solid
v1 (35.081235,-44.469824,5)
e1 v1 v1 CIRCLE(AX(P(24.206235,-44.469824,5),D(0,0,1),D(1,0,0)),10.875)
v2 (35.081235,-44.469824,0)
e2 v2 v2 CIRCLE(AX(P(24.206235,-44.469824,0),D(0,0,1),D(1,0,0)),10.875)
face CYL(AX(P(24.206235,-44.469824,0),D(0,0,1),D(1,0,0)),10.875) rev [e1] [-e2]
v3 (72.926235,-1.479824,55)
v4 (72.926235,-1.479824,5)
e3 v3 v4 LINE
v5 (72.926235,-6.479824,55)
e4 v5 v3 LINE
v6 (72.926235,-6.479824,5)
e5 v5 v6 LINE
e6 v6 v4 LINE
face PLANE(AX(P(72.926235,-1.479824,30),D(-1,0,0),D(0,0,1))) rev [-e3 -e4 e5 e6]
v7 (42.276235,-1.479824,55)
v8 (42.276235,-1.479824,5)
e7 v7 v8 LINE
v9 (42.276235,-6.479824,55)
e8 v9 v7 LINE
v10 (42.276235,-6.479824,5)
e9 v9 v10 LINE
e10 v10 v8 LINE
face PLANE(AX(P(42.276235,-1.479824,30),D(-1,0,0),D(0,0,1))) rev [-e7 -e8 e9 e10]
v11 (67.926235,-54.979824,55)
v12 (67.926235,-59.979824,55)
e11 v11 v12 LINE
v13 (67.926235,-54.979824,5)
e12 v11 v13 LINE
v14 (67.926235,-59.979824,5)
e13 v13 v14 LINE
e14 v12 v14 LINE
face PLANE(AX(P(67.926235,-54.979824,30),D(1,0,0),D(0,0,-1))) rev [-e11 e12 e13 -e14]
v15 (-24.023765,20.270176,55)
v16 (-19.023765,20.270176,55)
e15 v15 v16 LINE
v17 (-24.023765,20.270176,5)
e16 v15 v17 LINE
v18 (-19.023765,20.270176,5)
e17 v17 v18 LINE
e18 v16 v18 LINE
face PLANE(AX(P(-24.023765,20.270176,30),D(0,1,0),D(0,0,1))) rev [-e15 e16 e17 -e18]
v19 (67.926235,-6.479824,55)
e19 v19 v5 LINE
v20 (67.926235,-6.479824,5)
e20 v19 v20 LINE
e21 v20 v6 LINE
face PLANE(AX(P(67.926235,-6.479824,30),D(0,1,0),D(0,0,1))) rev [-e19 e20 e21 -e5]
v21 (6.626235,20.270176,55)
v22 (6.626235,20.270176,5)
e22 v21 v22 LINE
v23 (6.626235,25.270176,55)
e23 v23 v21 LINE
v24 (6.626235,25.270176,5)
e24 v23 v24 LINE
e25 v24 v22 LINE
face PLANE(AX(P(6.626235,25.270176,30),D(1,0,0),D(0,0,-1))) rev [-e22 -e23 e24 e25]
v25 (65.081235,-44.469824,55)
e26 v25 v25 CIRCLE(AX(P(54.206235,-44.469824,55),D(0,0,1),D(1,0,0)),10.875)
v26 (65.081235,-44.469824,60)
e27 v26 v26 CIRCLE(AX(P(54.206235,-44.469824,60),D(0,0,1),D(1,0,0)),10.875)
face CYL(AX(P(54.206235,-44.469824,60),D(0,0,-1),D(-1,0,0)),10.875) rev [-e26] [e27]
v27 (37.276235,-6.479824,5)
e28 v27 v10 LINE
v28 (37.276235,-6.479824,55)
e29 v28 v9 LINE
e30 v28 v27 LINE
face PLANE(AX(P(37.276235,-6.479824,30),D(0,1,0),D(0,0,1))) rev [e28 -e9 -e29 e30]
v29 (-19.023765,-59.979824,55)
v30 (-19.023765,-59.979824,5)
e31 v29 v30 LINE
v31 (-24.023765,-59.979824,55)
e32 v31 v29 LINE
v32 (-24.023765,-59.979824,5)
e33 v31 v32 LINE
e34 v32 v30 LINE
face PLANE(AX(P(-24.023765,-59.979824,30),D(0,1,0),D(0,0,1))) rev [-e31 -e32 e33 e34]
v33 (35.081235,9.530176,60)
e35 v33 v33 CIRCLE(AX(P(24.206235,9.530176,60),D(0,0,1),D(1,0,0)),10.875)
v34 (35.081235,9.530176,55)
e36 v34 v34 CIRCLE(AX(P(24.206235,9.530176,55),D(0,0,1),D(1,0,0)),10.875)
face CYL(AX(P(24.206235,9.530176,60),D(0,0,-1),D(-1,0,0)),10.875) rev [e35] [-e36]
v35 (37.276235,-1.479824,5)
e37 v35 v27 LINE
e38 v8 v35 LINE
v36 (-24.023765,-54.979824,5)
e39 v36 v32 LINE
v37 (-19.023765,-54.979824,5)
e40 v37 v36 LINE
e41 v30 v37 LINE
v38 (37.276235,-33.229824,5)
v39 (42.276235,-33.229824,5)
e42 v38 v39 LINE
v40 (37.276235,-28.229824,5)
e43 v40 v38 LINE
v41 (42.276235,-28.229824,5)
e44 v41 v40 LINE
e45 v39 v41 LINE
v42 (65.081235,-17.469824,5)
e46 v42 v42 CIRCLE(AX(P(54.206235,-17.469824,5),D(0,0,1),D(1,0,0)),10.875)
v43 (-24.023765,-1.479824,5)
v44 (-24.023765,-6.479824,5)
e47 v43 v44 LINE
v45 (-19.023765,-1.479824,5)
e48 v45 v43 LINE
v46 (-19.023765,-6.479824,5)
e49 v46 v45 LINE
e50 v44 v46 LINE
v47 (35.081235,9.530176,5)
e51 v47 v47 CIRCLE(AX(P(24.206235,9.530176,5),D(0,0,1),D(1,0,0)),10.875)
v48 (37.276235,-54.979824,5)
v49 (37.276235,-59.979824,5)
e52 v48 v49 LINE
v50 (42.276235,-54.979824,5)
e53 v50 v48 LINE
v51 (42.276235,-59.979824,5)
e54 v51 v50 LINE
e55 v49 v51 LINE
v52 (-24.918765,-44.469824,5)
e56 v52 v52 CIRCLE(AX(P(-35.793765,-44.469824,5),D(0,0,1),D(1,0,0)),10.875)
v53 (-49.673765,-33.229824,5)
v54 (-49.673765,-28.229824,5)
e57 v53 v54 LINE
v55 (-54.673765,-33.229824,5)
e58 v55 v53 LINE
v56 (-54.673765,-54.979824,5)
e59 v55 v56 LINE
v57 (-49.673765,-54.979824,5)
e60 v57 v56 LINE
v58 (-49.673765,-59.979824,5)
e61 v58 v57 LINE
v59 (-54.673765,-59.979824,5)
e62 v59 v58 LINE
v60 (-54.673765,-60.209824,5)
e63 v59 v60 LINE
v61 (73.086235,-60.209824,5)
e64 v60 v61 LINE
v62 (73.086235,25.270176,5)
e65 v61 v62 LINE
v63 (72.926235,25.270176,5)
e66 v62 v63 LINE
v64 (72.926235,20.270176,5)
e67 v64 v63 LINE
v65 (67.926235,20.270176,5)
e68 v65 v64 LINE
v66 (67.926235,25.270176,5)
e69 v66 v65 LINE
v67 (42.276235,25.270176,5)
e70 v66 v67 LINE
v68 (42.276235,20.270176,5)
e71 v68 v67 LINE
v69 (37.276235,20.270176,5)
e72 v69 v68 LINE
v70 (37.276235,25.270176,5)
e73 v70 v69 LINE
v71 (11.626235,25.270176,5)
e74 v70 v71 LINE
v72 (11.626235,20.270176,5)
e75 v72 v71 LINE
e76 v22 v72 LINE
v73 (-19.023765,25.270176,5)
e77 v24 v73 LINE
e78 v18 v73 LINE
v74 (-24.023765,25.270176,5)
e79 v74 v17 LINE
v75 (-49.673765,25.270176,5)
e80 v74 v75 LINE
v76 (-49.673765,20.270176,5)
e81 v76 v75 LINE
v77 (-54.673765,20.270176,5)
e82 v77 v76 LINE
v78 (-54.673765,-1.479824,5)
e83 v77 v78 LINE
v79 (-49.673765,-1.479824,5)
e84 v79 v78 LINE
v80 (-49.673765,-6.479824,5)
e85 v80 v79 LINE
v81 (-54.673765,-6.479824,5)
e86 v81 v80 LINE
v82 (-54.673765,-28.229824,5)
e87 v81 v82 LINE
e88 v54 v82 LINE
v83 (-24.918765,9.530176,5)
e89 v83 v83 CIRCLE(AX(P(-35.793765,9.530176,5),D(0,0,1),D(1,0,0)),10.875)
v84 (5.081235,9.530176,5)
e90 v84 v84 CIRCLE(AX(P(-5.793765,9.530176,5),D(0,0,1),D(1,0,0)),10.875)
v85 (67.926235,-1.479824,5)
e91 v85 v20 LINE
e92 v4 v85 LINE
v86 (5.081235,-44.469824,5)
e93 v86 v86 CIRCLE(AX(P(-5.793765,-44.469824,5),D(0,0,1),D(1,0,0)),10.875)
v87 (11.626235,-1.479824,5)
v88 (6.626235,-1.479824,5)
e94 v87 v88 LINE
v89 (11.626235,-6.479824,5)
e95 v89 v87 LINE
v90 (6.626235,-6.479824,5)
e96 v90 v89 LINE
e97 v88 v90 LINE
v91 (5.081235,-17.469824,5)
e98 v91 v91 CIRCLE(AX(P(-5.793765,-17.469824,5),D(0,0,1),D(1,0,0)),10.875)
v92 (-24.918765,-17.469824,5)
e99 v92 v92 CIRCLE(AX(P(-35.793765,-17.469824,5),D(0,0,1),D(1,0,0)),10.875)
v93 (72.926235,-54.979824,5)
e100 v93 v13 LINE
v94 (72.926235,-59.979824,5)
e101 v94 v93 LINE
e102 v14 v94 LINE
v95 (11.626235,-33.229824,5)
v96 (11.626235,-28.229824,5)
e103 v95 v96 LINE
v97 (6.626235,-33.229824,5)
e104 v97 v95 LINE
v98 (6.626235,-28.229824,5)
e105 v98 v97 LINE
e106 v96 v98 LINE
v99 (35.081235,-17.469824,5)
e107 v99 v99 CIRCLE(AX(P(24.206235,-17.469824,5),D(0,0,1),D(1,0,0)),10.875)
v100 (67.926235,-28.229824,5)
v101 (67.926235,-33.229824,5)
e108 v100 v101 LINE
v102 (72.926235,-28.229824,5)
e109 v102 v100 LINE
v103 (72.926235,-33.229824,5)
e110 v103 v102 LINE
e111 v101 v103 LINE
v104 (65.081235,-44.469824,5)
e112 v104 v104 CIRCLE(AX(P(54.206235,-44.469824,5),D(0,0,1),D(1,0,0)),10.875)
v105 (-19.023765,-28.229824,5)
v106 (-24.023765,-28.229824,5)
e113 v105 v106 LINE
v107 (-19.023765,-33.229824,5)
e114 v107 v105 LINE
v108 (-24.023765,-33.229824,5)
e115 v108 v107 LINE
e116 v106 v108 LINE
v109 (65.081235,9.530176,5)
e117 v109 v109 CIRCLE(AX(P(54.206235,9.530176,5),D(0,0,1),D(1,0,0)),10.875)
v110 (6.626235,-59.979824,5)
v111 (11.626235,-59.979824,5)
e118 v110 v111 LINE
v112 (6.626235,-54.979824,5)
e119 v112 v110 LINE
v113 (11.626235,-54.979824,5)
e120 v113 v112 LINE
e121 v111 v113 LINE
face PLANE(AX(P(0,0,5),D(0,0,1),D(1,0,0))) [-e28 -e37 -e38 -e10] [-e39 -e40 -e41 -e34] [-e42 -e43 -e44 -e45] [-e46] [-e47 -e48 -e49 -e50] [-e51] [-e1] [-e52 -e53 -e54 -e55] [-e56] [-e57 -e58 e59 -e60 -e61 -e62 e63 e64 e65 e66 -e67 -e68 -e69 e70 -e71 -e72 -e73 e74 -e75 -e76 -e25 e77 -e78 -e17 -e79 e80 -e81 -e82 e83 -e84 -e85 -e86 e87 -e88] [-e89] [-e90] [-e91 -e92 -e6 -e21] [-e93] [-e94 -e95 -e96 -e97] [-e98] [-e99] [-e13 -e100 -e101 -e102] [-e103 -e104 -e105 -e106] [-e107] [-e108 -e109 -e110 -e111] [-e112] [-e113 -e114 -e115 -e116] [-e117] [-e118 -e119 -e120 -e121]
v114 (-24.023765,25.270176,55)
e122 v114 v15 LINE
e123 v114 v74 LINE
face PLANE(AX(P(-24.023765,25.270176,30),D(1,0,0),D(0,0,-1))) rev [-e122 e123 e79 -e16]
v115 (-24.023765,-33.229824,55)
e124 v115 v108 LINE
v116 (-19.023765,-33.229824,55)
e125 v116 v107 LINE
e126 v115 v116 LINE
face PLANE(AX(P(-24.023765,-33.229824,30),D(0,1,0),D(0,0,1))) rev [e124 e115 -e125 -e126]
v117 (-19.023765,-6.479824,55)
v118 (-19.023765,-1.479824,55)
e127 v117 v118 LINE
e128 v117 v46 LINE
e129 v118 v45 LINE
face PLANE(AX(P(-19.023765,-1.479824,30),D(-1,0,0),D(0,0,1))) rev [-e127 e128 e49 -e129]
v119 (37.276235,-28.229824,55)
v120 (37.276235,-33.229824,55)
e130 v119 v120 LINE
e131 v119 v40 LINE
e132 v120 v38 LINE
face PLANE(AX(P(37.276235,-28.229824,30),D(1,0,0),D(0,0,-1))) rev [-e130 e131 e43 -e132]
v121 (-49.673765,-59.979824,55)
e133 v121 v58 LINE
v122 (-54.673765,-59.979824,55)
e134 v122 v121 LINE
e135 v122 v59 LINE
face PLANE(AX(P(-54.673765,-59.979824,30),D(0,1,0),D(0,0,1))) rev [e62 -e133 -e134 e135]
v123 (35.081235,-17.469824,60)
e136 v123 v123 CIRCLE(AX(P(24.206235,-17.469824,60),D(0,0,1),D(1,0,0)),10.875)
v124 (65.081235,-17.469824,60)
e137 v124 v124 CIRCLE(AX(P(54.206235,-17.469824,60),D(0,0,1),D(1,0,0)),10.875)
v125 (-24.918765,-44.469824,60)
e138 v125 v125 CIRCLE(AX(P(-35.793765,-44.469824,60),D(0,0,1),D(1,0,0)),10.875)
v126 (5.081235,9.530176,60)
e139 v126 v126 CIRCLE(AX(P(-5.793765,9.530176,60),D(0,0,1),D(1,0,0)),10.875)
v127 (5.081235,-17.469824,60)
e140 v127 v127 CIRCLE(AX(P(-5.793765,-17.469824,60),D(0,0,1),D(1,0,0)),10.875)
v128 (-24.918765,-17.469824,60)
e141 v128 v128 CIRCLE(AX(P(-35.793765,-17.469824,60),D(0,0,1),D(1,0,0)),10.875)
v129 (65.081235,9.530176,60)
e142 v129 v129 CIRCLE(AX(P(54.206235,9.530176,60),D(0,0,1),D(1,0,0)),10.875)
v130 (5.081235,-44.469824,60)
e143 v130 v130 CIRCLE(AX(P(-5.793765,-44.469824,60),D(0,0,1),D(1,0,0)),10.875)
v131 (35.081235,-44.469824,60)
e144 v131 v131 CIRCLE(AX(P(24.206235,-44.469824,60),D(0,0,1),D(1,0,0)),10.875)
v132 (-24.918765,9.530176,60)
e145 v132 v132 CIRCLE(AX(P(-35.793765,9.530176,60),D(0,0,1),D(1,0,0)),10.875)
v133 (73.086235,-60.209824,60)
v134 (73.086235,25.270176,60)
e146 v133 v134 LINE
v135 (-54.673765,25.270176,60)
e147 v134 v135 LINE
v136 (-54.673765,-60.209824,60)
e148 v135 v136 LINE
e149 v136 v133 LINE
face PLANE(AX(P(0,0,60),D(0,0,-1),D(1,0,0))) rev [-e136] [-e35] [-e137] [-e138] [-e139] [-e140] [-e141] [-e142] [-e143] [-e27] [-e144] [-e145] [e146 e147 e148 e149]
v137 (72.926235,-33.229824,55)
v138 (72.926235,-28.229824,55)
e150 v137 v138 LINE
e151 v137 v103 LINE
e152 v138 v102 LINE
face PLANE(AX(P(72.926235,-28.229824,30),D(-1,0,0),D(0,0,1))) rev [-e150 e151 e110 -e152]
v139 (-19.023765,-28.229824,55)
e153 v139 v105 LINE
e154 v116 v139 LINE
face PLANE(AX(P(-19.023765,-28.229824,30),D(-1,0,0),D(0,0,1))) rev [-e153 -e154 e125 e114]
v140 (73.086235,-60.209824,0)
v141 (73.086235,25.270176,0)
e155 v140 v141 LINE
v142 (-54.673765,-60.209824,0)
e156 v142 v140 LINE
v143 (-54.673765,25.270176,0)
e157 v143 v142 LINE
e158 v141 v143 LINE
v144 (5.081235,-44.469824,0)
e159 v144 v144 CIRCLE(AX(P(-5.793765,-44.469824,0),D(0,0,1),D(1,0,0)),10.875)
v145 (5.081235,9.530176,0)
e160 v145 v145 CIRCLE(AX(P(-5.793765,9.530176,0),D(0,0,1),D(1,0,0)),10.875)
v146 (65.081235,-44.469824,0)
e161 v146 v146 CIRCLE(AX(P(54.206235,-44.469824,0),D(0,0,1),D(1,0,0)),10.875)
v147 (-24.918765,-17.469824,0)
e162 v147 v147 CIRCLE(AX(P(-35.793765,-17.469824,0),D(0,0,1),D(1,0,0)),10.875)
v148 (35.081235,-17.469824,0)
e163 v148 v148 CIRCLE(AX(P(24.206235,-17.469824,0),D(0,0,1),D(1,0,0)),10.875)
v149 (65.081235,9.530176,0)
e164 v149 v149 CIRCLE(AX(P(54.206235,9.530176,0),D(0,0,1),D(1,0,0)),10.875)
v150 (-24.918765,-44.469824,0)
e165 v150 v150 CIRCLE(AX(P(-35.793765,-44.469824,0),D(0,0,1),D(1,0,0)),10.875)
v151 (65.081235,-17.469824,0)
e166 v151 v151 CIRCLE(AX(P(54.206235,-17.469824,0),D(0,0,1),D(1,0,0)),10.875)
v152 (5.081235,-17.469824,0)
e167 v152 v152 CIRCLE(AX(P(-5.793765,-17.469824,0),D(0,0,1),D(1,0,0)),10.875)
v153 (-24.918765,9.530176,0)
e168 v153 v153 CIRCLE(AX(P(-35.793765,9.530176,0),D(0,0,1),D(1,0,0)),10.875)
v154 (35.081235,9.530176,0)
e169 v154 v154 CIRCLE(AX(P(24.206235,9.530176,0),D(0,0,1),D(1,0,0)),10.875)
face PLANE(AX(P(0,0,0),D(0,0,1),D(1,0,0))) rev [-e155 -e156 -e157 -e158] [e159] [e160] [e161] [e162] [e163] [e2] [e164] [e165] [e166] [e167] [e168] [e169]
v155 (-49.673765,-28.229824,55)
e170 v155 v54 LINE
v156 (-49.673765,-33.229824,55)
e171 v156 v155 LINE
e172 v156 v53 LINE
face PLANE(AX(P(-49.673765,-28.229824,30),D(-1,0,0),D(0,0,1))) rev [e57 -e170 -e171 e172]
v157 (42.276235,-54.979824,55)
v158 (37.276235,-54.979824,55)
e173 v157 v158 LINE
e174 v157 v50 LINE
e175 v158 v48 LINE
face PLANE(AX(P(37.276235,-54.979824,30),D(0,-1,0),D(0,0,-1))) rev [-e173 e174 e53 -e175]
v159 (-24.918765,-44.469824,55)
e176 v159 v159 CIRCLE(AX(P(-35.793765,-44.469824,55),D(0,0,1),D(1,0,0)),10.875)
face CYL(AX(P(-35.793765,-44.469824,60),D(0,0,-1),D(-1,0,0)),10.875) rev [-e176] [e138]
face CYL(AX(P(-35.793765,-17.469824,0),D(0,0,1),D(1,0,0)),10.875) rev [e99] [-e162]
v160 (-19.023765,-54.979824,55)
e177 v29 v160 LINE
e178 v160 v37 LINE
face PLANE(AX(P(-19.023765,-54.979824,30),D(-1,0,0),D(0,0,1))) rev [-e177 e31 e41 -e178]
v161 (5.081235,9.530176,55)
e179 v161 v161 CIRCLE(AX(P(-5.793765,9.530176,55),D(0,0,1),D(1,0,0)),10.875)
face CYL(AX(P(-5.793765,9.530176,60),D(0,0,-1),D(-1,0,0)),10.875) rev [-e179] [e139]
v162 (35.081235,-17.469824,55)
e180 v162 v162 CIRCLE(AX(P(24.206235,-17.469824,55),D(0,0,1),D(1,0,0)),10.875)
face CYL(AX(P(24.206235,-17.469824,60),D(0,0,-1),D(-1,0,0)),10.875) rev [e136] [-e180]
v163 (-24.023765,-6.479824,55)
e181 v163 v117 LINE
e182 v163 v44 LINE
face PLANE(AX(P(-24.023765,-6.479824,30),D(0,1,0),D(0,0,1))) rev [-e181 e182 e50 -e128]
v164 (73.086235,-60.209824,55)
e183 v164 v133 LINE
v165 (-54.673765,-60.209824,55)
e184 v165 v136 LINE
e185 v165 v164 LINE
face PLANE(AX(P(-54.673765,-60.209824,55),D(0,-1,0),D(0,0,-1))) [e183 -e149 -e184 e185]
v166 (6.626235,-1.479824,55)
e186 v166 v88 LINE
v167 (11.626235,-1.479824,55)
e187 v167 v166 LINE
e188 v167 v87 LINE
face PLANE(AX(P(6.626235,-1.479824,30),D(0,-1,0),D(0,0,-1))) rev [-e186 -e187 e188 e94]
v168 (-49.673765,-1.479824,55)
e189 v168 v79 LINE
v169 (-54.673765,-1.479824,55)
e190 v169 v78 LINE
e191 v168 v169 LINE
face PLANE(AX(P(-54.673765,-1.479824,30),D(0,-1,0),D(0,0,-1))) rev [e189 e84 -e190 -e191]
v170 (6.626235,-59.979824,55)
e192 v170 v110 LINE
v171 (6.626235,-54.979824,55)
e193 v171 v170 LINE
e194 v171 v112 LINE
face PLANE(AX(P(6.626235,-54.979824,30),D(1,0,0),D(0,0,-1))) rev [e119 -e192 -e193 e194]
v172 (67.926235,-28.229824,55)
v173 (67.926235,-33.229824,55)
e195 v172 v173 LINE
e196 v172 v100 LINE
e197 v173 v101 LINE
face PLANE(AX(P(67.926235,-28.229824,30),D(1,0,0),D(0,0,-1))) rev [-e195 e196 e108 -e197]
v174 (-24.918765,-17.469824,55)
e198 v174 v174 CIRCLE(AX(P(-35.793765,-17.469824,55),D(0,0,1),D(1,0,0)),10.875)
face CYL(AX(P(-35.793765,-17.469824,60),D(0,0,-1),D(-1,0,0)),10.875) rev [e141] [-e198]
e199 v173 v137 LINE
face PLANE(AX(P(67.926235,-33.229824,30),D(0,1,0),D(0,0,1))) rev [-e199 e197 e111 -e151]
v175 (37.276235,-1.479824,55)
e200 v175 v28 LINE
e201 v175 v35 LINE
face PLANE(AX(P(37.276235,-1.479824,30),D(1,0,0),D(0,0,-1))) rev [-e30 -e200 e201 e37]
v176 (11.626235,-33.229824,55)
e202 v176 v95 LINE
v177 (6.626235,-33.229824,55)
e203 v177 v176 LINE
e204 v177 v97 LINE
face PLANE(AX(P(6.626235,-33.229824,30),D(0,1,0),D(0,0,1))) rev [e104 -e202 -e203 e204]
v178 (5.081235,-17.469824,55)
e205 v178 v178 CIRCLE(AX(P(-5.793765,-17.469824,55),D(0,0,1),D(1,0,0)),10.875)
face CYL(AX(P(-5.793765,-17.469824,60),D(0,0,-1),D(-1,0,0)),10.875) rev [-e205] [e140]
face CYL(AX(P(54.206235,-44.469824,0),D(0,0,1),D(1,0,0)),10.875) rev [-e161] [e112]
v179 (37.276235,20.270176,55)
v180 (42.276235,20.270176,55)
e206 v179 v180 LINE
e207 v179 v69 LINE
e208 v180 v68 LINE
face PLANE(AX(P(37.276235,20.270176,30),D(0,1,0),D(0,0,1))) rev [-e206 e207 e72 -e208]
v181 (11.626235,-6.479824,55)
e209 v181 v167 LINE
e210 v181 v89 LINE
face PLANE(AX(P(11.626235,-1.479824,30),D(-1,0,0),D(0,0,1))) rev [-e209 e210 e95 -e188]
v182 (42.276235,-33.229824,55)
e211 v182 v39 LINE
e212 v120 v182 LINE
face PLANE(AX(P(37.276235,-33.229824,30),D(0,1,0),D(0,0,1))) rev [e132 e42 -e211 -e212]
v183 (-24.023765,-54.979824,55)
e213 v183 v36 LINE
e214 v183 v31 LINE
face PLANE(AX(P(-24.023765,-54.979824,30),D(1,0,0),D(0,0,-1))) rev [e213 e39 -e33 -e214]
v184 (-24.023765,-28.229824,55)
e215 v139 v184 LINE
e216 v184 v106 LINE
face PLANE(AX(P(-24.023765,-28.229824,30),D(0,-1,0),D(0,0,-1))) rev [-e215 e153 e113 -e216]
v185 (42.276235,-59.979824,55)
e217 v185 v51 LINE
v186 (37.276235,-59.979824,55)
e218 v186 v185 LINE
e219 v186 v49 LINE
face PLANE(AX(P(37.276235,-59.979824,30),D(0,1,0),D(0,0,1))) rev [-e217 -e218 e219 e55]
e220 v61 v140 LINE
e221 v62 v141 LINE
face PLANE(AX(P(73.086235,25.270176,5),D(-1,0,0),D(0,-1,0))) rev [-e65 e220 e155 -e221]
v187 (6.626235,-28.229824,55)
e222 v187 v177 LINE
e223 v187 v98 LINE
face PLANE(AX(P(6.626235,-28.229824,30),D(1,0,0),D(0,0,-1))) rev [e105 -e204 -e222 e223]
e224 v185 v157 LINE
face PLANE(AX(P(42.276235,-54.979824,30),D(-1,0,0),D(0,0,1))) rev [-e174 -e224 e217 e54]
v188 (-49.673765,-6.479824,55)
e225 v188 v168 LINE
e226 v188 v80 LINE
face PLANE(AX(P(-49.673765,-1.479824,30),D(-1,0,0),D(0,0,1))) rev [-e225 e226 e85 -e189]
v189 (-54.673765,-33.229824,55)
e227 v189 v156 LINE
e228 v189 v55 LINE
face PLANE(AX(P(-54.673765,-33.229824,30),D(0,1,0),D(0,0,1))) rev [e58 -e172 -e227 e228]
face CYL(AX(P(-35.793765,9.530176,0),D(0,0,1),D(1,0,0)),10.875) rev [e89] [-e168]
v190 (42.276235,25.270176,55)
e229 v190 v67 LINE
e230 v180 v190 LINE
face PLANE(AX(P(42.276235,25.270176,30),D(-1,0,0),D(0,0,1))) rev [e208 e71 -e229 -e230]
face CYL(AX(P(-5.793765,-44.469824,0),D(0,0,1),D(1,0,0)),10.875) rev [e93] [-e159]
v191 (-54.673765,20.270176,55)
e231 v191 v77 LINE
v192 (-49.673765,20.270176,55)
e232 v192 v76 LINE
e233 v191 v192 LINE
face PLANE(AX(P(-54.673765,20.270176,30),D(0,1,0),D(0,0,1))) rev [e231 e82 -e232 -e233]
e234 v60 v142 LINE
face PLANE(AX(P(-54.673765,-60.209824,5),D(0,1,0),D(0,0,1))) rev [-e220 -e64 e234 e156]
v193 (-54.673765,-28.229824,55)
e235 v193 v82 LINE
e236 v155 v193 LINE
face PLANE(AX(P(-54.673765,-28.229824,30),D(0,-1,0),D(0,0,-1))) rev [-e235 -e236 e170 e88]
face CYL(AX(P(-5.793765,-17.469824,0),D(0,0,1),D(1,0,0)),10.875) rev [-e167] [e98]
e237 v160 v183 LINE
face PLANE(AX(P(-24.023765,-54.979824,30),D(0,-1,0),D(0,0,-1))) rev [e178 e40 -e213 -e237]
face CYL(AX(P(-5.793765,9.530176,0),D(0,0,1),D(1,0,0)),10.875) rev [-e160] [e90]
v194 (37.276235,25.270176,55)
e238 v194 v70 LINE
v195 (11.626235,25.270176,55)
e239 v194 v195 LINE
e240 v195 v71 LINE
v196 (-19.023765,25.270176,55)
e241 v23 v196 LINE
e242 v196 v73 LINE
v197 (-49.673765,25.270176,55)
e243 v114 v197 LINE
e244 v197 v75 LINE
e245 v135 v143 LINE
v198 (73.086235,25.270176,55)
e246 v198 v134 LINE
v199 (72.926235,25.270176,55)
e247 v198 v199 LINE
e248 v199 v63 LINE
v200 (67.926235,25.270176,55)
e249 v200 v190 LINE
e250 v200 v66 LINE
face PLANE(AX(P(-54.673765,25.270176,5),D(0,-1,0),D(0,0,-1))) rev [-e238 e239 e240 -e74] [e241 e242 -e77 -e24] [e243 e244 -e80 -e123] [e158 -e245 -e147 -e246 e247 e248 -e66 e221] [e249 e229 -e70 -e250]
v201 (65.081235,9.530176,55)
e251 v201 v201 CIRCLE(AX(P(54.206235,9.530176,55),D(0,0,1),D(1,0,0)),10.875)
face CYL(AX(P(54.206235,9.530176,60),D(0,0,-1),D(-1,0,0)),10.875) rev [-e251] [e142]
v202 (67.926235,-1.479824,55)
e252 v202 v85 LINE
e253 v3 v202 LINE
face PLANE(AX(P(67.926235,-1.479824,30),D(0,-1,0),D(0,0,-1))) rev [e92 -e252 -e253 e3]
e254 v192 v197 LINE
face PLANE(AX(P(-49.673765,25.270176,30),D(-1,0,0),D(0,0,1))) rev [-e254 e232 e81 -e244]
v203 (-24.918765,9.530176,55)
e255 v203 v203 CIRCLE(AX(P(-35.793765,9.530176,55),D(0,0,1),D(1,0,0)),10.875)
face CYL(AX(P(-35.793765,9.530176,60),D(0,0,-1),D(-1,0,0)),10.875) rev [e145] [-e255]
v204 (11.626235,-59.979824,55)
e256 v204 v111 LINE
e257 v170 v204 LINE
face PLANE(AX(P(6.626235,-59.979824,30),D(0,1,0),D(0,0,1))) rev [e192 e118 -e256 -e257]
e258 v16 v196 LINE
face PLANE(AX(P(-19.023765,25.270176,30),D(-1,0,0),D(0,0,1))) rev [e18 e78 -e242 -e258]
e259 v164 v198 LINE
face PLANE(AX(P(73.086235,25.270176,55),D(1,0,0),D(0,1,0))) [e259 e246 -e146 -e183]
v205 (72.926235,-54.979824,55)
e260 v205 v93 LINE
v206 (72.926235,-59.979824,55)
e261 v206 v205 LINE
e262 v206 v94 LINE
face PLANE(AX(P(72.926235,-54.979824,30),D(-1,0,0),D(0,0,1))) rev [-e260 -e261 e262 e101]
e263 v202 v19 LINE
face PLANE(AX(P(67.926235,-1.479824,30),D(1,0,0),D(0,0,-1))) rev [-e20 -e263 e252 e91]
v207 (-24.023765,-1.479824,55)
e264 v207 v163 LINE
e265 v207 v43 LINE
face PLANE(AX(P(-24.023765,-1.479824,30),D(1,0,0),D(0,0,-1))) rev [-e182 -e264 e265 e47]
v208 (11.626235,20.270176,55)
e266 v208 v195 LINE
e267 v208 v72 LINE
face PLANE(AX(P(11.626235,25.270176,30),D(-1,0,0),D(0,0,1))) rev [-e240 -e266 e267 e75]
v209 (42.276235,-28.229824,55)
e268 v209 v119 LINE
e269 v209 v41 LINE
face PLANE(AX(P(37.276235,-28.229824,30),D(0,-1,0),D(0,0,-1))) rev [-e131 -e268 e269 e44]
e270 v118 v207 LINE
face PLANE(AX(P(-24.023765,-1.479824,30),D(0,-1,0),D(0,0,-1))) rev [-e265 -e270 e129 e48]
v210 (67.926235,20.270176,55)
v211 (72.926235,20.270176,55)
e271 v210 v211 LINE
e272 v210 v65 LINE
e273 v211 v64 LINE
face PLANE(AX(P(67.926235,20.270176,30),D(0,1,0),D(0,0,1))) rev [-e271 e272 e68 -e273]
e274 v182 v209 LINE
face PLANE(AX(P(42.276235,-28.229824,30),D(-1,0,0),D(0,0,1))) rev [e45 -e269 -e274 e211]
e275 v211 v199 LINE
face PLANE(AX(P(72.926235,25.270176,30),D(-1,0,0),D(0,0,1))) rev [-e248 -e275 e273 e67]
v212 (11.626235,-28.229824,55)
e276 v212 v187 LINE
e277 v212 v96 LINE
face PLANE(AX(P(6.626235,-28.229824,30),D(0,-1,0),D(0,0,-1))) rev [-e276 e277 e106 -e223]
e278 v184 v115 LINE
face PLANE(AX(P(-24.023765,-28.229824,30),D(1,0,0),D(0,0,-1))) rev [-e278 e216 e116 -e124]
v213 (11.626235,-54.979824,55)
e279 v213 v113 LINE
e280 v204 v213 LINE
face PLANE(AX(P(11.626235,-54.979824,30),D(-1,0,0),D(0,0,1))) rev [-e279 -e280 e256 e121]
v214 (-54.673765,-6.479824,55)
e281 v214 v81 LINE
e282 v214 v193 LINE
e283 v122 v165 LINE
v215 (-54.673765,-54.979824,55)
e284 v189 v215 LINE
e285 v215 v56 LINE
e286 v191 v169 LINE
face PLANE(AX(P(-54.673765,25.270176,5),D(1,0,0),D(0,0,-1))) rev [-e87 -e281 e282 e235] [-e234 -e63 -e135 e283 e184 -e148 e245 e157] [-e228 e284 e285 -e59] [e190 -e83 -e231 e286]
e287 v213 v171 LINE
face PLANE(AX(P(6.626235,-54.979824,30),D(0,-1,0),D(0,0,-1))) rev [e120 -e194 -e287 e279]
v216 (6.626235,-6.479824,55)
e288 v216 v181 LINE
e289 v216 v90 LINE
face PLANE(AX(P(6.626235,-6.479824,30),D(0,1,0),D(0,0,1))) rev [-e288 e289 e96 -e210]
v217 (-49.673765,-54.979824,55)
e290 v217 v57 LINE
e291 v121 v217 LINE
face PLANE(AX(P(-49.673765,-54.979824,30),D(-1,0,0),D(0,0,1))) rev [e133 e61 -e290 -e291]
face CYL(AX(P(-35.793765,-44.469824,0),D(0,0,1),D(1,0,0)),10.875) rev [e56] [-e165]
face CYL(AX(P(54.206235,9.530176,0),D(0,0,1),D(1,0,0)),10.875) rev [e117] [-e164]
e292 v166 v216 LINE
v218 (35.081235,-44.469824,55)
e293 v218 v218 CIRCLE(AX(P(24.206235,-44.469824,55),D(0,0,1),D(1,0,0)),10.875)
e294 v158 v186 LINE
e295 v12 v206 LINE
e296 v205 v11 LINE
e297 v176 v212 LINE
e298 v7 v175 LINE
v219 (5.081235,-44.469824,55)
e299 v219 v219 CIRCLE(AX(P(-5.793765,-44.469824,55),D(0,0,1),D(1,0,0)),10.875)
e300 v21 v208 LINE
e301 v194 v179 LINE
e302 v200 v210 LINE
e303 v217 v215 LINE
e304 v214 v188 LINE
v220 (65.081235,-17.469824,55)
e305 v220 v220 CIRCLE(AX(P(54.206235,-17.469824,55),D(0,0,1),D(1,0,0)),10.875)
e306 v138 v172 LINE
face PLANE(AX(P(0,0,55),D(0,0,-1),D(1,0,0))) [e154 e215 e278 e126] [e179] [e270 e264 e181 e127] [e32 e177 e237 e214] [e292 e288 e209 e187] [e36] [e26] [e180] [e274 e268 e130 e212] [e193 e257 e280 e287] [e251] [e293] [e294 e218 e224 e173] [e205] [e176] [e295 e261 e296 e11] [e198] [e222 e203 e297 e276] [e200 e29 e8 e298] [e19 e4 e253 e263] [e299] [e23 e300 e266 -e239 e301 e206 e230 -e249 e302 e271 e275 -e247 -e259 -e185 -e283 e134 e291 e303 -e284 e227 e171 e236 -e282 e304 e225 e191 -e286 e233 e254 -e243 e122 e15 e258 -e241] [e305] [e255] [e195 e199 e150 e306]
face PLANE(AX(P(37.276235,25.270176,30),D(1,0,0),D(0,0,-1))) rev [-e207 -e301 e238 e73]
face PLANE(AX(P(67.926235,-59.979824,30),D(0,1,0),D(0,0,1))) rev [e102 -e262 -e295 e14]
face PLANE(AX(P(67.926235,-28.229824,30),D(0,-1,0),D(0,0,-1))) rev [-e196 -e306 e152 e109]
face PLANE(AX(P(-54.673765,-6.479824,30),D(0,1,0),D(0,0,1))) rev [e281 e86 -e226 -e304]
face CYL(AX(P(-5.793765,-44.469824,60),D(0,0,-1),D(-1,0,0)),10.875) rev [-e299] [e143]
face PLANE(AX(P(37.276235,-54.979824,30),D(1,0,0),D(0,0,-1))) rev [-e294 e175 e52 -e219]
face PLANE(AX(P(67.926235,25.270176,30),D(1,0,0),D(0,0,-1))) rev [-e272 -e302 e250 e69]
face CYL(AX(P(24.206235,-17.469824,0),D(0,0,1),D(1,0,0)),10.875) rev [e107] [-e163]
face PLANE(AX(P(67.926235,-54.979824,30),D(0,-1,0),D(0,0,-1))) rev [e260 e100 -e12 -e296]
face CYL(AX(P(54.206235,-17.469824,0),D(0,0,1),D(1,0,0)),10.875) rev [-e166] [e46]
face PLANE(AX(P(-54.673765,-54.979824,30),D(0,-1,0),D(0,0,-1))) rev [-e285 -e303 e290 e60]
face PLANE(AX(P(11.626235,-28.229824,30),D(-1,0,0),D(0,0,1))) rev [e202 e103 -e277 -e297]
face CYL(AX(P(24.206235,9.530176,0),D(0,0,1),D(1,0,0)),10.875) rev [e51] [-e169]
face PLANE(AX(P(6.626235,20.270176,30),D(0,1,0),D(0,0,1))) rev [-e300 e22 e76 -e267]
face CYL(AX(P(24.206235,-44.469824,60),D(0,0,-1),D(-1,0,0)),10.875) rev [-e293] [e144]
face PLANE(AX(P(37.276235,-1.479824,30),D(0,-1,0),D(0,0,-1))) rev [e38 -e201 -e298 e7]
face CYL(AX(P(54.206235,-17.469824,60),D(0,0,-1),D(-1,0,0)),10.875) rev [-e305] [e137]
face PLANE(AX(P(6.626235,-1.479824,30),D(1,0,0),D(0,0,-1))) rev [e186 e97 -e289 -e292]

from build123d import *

# Parameters (mm, degrees)
SKETCH1_W                = 127.76
SKETCH1_H                = 85.48
BOSS_EXTRUDE1_DEPTH      = 5
SKETCH2_R                = 10.875
CUT_EXTRUDE1_DEPTH       = 95.825210988
SKETCH3_W                = 5
SKETCH3_H                = 5
BOSS_EXTRUDE2_DEPTH      = 25
LPATTERN2_COUNT          = 4
LPATTERN2_PITCH          = 30
LPATTERN2_COUNT_DIR2     = 3
LPATTERN2_PITCH_DIR2     = 27
LPATTERN3_COUNT          = 5
LPATTERN3_PITCH          = 30.65
LPATTERN3_COUNT_DIR2     = 4
LPATTERN3_PITCH_DIR2     = 26.75
MIRROR5_START            = -54.673764706
MIRROR5_OUTLINE_W        = 5
MIRROR5_OUTLINE_H        = 25
MIRROR5_DEPTH            = 5
MIRROR5_START_2          = -24.023764706
MIRROR5_2_OUTLINE_W      = 5
MIRROR5_2_OUTLINE_H      = 25
MIRROR5_2_DEPTH          = 5
MIRROR5_START_3          = 6.626235294
MIRROR5_3_OUTLINE_W      = 5
MIRROR5_3_OUTLINE_H      = 25
MIRROR5_3_DEPTH          = 5
MIRROR5_START_4          = 37.276235294
MIRROR5_4_OUTLINE_W      = 5
MIRROR5_4_OUTLINE_H      = 25
MIRROR5_4_DEPTH          = 5
MIRROR5_START_5          = 67.926235294
MIRROR5_5_OUTLINE_W      = 5
MIRROR5_5_OUTLINE_H      = 25
MIRROR5_5_DEPTH          = 5
MIRROR6_COPY_1_SKETCH_R  = 10.875
MIRROR6_COPY_1_DEPTH     = 95.825210988
MIRROR6_COPY_2_SKETCH_R  = 10.875
MIRROR6_COPY_2_DEPTH     = 95.825210988
MIRROR6_COPY_3_SKETCH_R  = 10.875
MIRROR6_COPY_3_DEPTH     = 95.825210988
MIRROR6_COPY_4_SKETCH_R  = 10.875
MIRROR6_COPY_4_DEPTH     = 95.825210988
MIRROR6_COPY_5_SKETCH_R  = 10.875
MIRROR6_COPY_5_DEPTH     = 95.825210988
MIRROR6_COPY_6_SKETCH_R  = 10.875
MIRROR6_COPY_6_DEPTH     = 95.825210988
MIRROR6_COPY_7_SKETCH_R  = 10.875
MIRROR6_COPY_7_DEPTH     = 95.825210988
MIRROR6_COPY_8_SKETCH_R  = 10.875
MIRROR6_COPY_8_DEPTH     = 95.825210988
MIRROR6_COPY_9_SKETCH_R  = 10.875
MIRROR6_COPY_9_DEPTH     = 95.825210988
MIRROR6_COPY_10_SKETCH_R = 10.875
MIRROR6_COPY_10_DEPTH    = 95.825210988
MIRROR6_COPY_11_SKETCH_R = 10.875
MIRROR6_COPY_11_DEPTH    = 95.825210988


# Read off the part's stored shape, not the designer's step: Mirror5
with BuildPart() as part:
    # Sketch1 → Boss-Extrude1 (new body)
    with BuildSketch(Plane.XY):
        with Locations((9.206235294, -17.469823529)):
            Rectangle(SKETCH1_W, SKETCH1_H)
    boss_extrude1 = extrude(amount=BOSS_EXTRUDE1_DEPTH)

    # Sketch2 → Cut-Extrude1 (cut, through all)
    with BuildSketch(Plane.XY.offset(5)):
        with Locations((-35.793764706, 9.530176471)):
            Circle(SKETCH2_R)
    cut_extrude1 = extrude(amount=-CUT_EXTRUDE1_DEPTH, mode=Mode.SUBTRACT)

    # Sketch3 → Boss-Extrude2 (add)
    with BuildSketch(Plane.XY.offset(5)):
        with Locations((-52.173764706, 22.770176471)):
            Rectangle(SKETCH3_W, SKETCH3_H)
    boss_extrude2 = extrude(amount=BOSS_EXTRUDE2_DEPTH)

    # LPattern2: Cut-Extrude1 4 × 3
    with Locations(*[(i * LPATTERN2_PITCH, -j * LPATTERN2_PITCH_DIR2, 0) for i in range(LPATTERN2_COUNT) for j in range(LPATTERN2_COUNT_DIR2) if (i, j) != (0, 0)]):
        add(cut_extrude1, mode=Mode.SUBTRACT)

    # LPattern3: Boss-Extrude2 5 × 4
    with Locations(*[(i * LPATTERN3_PITCH, -j * LPATTERN3_PITCH_DIR2, 0) for i in range(LPATTERN3_COUNT) for j in range(LPATTERN3_COUNT_DIR2) if (i, j) != (0, 0)]):
        add(boss_extrude2)

    # Mirror5 outline → Mirror5 (add)
    with BuildSketch(Plane.YZ.offset(MIRROR5_START)):
        with Locations((22.770176471, 42.5)):
            Rectangle(MIRROR5_OUTLINE_W, MIRROR5_OUTLINE_H)
        with Locations((-3.979823529, 42.5)):
            Rectangle(MIRROR5_OUTLINE_W, MIRROR5_OUTLINE_H)
        with Locations((-30.729823529, 42.5)):
            Rectangle(MIRROR5_OUTLINE_W, MIRROR5_OUTLINE_H)
        with Locations((-57.479823529, 42.5)):
            Rectangle(MIRROR5_OUTLINE_W, MIRROR5_OUTLINE_H)
    extrude(amount=MIRROR5_DEPTH)

    # Mirror5 2 outline → Mirror5 2 (add)
    with BuildSketch(Plane.YZ.offset(MIRROR5_START_2)):
        with Locations((22.770176471, 42.5)):
            Rectangle(MIRROR5_2_OUTLINE_W, MIRROR5_2_OUTLINE_H)
        with Locations((-3.979823529, 42.5)):
            Rectangle(MIRROR5_2_OUTLINE_W, MIRROR5_2_OUTLINE_H)
        with Locations((-30.729823529, 42.5)):
            Rectangle(MIRROR5_2_OUTLINE_W, MIRROR5_2_OUTLINE_H)
        with Locations((-57.479823529, 42.5)):
            Rectangle(MIRROR5_2_OUTLINE_W, MIRROR5_2_OUTLINE_H)
    extrude(amount=MIRROR5_2_DEPTH)

    # Mirror5 3 outline → Mirror5 3 (add)
    with BuildSketch(Plane.YZ.offset(MIRROR5_START_3)):
        with Locations((22.770176471, 42.5)):
            Rectangle(MIRROR5_3_OUTLINE_W, MIRROR5_3_OUTLINE_H)
        with Locations((-3.979823529, 42.5)):
            Rectangle(MIRROR5_3_OUTLINE_W, MIRROR5_3_OUTLINE_H)
        with Locations((-30.729823529, 42.5)):
            Rectangle(MIRROR5_3_OUTLINE_W, MIRROR5_3_OUTLINE_H)
        with Locations((-57.479823529, 42.5)):
            Rectangle(MIRROR5_3_OUTLINE_W, MIRROR5_3_OUTLINE_H)
    extrude(amount=MIRROR5_3_DEPTH)

    # Mirror5 4 outline → Mirror5 4 (add)
    with BuildSketch(Plane.YZ.offset(MIRROR5_START_4)):
        with Locations((22.770176471, 42.5)):
            Rectangle(MIRROR5_4_OUTLINE_W, MIRROR5_4_OUTLINE_H)
        with Locations((-3.979823529, 42.5)):
            Rectangle(MIRROR5_4_OUTLINE_W, MIRROR5_4_OUTLINE_H)
        with Locations((-30.729823529, 42.5)):
            Rectangle(MIRROR5_4_OUTLINE_W, MIRROR5_4_OUTLINE_H)
        with Locations((-57.479823529, 42.5)):
            Rectangle(MIRROR5_4_OUTLINE_W, MIRROR5_4_OUTLINE_H)
    extrude(amount=MIRROR5_4_DEPTH)

    # Mirror5 5 outline → Mirror5 5 (add)
    with BuildSketch(Plane.YZ.offset(MIRROR5_START_5)):
        with Locations((22.770176471, 42.5)):
            Rectangle(MIRROR5_5_OUTLINE_W, MIRROR5_5_OUTLINE_H)
        with Locations((-3.979823529, 42.5)):
            Rectangle(MIRROR5_5_OUTLINE_W, MIRROR5_5_OUTLINE_H)
        with Locations((-30.729823529, 42.5)):
            Rectangle(MIRROR5_5_OUTLINE_W, MIRROR5_5_OUTLINE_H)
        with Locations((-57.479823529, 42.5)):
            Rectangle(MIRROR5_5_OUTLINE_W, MIRROR5_5_OUTLINE_H)
    extrude(amount=MIRROR5_5_DEPTH)

    # Mirror6: Boss-Extrude1, Cut-Extrude1 across plane
    add(boss_extrude1.mirror(Plane(origin=(0, 0, 30), x_dir=(1, 0, 0), z_dir=(0, 0, -1))))
    add(cut_extrude1.mirror(Plane(origin=(0, 0, 30), x_dir=(1, 0, 0), z_dir=(0, 0, -1))), mode=Mode.SUBTRACT)

    # Mirror6 copy 1 sketch → Mirror6 copy 1 (cut, through all)
    with BuildSketch(Plane(origin=(0, -27, 55), x_dir=(1, 0, 0), z_dir=(0, 0, -1))):
        with Locations((-35.793764706, -9.530176471)):
            Circle(MIRROR6_COPY_1_SKETCH_R)
    extrude(amount=-MIRROR6_COPY_1_DEPTH, mode=Mode.SUBTRACT)

    # Mirror6 copy 2 sketch → Mirror6 copy 2 (cut, through all)
    with BuildSketch(Plane(origin=(0, -54, 55), x_dir=(1, 0, 0), z_dir=(0, 0, -1))):
        with Locations((-35.793764706, -9.530176471)):
            Circle(MIRROR6_COPY_2_SKETCH_R)
    extrude(amount=-MIRROR6_COPY_2_DEPTH, mode=Mode.SUBTRACT)

    # Mirror6 copy 3 sketch → Mirror6 copy 3 (cut, through all)
    with BuildSketch(Plane(origin=(30, 0, 55), x_dir=(1, 0, 0), z_dir=(0, 0, -1))):
        with Locations((-35.793764706, -9.530176471)):
            Circle(MIRROR6_COPY_3_SKETCH_R)
    extrude(amount=-MIRROR6_COPY_3_DEPTH, mode=Mode.SUBTRACT)

    # Mirror6 copy 4 sketch → Mirror6 copy 4 (cut, through all)
    with BuildSketch(Plane(origin=(30, -27, 55), x_dir=(1, 0, 0), z_dir=(0, 0, -1))):
        with Locations((-35.793764706, -9.530176471)):
            Circle(MIRROR6_COPY_4_SKETCH_R)
    extrude(amount=-MIRROR6_COPY_4_DEPTH, mode=Mode.SUBTRACT)

    # Mirror6 copy 5 sketch → Mirror6 copy 5 (cut, through all)
    with BuildSketch(Plane(origin=(30, -54, 55), x_dir=(1, 0, 0), z_dir=(0, 0, -1))):
        with Locations((-35.793764706, -9.530176471)):
            Circle(MIRROR6_COPY_5_SKETCH_R)
    extrude(amount=-MIRROR6_COPY_5_DEPTH, mode=Mode.SUBTRACT)

    # Mirror6 copy 6 sketch → Mirror6 copy 6 (cut, through all)
    with BuildSketch(Plane(origin=(60, 0, 55), x_dir=(1, 0, 0), z_dir=(0, 0, -1))):
        with Locations((-35.793764706, -9.530176471)):
            Circle(MIRROR6_COPY_6_SKETCH_R)
    extrude(amount=-MIRROR6_COPY_6_DEPTH, mode=Mode.SUBTRACT)

    # Mirror6 copy 7 sketch → Mirror6 copy 7 (cut, through all)
    with BuildSketch(Plane(origin=(60, -27, 55), x_dir=(1, 0, 0), z_dir=(0, 0, -1))):
        with Locations((-35.793764706, -9.530176471)):
            Circle(MIRROR6_COPY_7_SKETCH_R)
    extrude(amount=-MIRROR6_COPY_7_DEPTH, mode=Mode.SUBTRACT)

    # Mirror6 copy 8 sketch → Mirror6 copy 8 (cut, through all)
    with BuildSketch(Plane(origin=(60, -54, 55), x_dir=(1, 0, 0), z_dir=(0, 0, -1))):
        with Locations((-35.793764706, -9.530176471)):
            Circle(MIRROR6_COPY_8_SKETCH_R)
    extrude(amount=-MIRROR6_COPY_8_DEPTH, mode=Mode.SUBTRACT)

    # Mirror6 copy 9 sketch → Mirror6 copy 9 (cut, through all)
    with BuildSketch(Plane(origin=(90, 0, 55), x_dir=(1, 0, 0), z_dir=(0, 0, -1))):
        with Locations((-35.793764706, -9.530176471)):
            Circle(MIRROR6_COPY_9_SKETCH_R)
    extrude(amount=-MIRROR6_COPY_9_DEPTH, mode=Mode.SUBTRACT)

    # Mirror6 copy 10 sketch → Mirror6 copy 10 (cut, through all)
    with BuildSketch(Plane(origin=(90, -27, 55), x_dir=(1, 0, 0), z_dir=(0, 0, -1))):
        with Locations((-35.793764706, -9.530176471)):
            Circle(MIRROR6_COPY_10_SKETCH_R)
    extrude(amount=-MIRROR6_COPY_10_DEPTH, mode=Mode.SUBTRACT)

    # Mirror6 copy 11 sketch → Mirror6 copy 11 (cut, through all)
    with BuildSketch(Plane(origin=(90, -54, 55), x_dir=(1, 0, 0), z_dir=(0, 0, -1))):
        with Locations((-35.793764706, -9.530176471)):
            Circle(MIRROR6_COPY_11_SKETCH_R)
    extrude(amount=-MIRROR6_COPY_11_DEPTH, mode=Mode.SUBTRACT)


solid = part.part
